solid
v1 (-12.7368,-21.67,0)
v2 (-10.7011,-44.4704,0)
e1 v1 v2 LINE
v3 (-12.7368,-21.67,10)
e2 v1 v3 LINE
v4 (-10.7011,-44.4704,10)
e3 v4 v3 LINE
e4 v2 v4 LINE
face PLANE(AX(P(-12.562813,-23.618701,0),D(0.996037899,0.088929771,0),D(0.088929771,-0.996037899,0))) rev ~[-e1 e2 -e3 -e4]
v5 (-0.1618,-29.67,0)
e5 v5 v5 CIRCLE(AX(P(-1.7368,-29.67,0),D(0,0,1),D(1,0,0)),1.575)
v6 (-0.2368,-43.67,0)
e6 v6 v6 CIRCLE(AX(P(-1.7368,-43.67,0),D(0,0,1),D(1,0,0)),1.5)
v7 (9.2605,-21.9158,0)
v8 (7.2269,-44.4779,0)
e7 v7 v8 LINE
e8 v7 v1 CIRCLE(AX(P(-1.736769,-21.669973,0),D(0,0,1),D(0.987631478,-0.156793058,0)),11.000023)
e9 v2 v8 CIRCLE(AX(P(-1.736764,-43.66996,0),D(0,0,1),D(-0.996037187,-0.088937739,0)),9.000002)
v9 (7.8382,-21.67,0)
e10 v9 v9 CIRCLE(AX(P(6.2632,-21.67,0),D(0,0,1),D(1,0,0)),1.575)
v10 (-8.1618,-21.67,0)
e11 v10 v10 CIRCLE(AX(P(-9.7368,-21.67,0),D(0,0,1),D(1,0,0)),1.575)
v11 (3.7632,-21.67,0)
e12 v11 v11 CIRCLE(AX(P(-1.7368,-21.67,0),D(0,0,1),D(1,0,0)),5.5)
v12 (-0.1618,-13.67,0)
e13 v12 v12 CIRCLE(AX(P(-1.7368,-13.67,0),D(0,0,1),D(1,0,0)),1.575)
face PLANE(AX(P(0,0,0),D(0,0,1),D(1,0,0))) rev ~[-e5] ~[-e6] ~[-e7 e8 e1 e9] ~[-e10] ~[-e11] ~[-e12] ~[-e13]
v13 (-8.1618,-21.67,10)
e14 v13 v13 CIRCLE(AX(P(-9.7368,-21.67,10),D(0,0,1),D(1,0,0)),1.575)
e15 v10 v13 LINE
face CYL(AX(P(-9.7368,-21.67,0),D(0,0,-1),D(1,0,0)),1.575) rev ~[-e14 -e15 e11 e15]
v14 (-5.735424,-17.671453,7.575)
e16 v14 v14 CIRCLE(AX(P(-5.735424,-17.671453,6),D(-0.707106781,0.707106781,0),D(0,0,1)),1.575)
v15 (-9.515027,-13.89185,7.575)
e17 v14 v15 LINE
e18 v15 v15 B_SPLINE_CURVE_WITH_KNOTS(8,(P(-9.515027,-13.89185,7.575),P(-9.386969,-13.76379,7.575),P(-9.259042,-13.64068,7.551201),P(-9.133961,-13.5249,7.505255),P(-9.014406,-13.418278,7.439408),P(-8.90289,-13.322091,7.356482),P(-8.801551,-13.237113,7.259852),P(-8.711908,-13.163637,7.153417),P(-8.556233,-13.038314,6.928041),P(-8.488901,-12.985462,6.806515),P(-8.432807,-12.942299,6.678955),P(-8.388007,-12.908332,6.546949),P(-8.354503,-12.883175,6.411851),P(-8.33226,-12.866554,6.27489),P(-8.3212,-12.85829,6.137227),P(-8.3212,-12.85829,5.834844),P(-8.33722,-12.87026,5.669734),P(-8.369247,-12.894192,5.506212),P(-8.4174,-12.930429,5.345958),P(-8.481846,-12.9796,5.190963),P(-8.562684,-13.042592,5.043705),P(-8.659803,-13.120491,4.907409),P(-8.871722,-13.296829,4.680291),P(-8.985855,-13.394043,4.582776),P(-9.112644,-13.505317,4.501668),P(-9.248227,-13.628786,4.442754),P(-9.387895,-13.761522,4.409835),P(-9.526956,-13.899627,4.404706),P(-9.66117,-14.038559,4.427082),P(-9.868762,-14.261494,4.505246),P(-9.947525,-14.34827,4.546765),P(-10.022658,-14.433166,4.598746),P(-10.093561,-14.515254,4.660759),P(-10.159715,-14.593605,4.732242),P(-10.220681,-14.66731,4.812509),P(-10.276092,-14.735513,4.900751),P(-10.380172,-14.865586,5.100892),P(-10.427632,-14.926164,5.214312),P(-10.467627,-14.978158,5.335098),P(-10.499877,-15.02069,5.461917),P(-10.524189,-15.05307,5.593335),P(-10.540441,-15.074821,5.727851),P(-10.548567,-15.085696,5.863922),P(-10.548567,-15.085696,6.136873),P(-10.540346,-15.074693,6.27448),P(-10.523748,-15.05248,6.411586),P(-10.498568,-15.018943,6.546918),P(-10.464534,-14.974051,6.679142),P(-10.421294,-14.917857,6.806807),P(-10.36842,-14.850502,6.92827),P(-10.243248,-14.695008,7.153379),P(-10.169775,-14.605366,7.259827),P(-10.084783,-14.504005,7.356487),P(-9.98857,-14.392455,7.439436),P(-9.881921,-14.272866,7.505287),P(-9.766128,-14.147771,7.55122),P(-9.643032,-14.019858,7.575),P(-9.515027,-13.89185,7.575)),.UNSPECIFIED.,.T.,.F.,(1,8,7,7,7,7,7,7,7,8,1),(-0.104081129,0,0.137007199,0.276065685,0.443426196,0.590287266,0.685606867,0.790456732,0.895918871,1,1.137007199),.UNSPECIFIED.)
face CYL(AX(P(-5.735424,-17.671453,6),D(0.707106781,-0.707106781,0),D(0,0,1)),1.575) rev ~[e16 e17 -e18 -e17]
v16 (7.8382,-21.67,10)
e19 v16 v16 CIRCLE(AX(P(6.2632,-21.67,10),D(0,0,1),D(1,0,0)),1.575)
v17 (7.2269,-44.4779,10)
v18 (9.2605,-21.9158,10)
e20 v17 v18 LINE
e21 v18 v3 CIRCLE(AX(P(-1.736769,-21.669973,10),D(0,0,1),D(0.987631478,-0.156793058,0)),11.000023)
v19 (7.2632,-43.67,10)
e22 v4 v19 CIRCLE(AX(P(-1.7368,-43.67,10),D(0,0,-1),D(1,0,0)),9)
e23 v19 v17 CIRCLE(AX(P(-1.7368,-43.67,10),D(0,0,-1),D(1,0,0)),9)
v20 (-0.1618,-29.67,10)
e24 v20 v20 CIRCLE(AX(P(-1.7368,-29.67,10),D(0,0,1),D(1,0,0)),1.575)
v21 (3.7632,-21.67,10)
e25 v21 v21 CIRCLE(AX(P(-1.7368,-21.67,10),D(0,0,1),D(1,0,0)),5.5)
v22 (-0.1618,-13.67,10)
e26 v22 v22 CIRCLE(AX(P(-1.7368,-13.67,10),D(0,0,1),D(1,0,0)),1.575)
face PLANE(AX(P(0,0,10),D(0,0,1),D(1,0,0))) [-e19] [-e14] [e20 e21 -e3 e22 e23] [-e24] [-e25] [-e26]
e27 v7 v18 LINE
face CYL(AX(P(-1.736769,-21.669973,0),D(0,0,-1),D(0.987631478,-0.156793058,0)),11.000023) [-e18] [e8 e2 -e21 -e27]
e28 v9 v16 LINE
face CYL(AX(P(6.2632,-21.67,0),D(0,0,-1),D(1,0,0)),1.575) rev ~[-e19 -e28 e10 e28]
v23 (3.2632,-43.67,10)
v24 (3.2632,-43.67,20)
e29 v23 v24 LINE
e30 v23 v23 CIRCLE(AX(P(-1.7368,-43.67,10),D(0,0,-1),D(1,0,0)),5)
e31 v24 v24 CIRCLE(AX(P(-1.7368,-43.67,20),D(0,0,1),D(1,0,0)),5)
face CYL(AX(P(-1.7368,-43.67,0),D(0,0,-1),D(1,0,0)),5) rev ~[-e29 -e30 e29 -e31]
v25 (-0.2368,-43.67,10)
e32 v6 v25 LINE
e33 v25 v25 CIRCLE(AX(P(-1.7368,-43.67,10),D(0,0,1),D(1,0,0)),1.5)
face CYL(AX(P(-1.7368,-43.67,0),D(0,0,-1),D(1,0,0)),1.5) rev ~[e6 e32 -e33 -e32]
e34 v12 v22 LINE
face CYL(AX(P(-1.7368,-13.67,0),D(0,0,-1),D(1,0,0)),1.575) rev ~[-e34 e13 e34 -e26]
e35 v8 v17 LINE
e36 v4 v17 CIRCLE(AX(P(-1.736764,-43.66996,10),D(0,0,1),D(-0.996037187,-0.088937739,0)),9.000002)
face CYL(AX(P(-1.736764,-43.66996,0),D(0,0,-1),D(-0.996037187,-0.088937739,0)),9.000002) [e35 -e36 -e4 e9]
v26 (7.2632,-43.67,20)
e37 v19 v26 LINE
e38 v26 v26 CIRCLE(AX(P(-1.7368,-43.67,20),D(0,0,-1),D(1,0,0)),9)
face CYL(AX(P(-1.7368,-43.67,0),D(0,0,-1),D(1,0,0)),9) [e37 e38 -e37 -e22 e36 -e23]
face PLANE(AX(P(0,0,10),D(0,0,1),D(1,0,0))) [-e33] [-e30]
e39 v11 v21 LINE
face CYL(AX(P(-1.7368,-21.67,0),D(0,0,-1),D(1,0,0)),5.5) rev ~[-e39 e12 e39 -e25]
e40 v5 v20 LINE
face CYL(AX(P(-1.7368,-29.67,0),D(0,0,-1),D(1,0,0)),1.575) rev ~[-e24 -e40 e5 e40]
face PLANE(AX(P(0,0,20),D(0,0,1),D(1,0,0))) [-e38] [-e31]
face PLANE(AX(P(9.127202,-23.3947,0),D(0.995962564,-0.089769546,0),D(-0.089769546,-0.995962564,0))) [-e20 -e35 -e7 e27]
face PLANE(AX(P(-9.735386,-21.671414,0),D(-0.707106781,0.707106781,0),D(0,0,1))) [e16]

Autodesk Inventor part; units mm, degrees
ref_plane "YZ Plane" through (0, 0, 0) normal (1, 0, 0) x (0, 1, 0)
sketch "Эскиз1" plane through (0, 0, 0) normal (0, 0, 1) x (1, 0, 0)
  circle A0 centre (-1.7368, -21.67) radius 2.375 projected
  circle A1 centre (-1.7368, -21.67) radius 7.5
  line L0 (-1.7368, -14.17) -> (-1.7368, -54.17) construction
  arc A2 (5.7632, -21.67) -> (-9.2368, -21.67) centre (-1.7368, -21.67) ccw
  circle A3 centre (-1.7368, -43.67) radius 9
  circle A4 centre (-1.7368, -43.67) radius 1.5
  circle A5 centre (-1.7368, -43.67) radius 5
  line L1 (-10.7368, -43.67) -> (-9.2368, -21.67)
  line L2 (7.2632, -43.67) -> (5.7632, -21.67)
  point P0 (0, 0)
  point P1 (-1.7368, -34.17)
  dimension "d1" = 15
  dimension "d3" = 18
  dimension "d4" = 3
  dimension "d9" = 10
  dimension "d36" = 22
extrude "Выдавливание1" add sketch "Эскиз1" along normal blind 20 contours L2 A3 L1 | A3 L2 | L1 A3
ref_plane "РабПлоскость1" through (0, 0, 0) normal (0, 0, 1) x (1, 0, 0)
sketch "Эскиз2" plane through (0, 0, 0) normal (0, 0, 1) x (1, 0, 0)
  arc A0 (-10.7011, -44.4704) -> (7.2269, -44.4779) centre (-1.7368, -43.67) ccw
  circle A1 centre (-1.7368, -46.2892) radius 1.5 construction
  line L0 (-1.7368, -46.2892) -> (-1.7368, -6.2497) construction
  line L1 (55.1846, -47.0725) -> (61.6072, -35.9345) construction
  line L2 (61.6072, -35.9345) -> (57.2758, -33.4368) construction
  line L3 (57.2758, -33.4368) -> (59.7378, -29.1672) construction
  line L4 (59.7378, -29.1672) -> (54.2369, -25.9951) construction
  line L5 (54.2369, -25.9951) -> (53.6124, -27.078) construction
  line L6 (53.6124, -27.078) -> (51.62, -25.929) construction
  line L7 (51.62, -25.929) -> (52.2444, -24.8462) construction
  line L8 (52.2444, -24.8462) -> (46.7434, -21.6741) construction
  line L9 (46.7434, -21.6741) -> (48.2421, -19.0752) construction
  line L10 (48.2421, -19.0752) -> (53.743, -22.2473) construction
  line L11 (53.743, -22.2473) -> (54.3674, -21.1644) construction
  line L12 (54.3674, -21.1644) -> (56.3599, -22.3134) construction
  line L13 (56.3599, -22.3134) -> (55.7355, -23.3962) construction
  line L14 (55.7355, -23.3962) -> (61.2364, -26.5683) construction
  line L15 (61.2364, -26.5683) -> (63.6984, -22.2987) construction
  line L16 (63.6984, -22.2987) -> (68.0299, -24.7964) construction
  line L17 (68.0299, -24.7964) -> (74.4526, -13.6584) construction
  line L18 (74.4526, -13.6584) -> (23.3414, 15.8145) construction
  arc A2 (23.3414, 15.8145) -> (19.2439, 14.7142) centre (21.8428, 13.2156) ccw construction
  line L19 (19.2439, 14.7142) -> (16.6854, 10.2772) construction
  arc A3 (12.8035, 9.064) -> (16.6854, 10.2772) centre (14.0865, 11.7758) ccw construction
  arc A4 (12.8035, 9.064) -> (-21.0534, -49.6498) centre (-1.7368, -21.67) ccw construction
  arc A5 (-20.1589, -53.6172) -> (-21.0534, -49.6498) centre (-22.7578, -52.1186) ccw construction
  line L20 (-20.1589, -53.6172) -> (-22.7175, -58.0542) construction
  arc A6 (-22.7175, -58.0542) -> (-21.6172, -62.1517) centre (-20.1186, -59.5528) ccw construction
  line L21 (-21.6172, -62.1517) -> (29.4939, -91.6246) construction
  line L22 (29.4939, -91.6246) -> (35.9166, -80.4866) construction
  line L23 (35.9166, -80.4866) -> (31.5851, -77.9889) construction
  line L24 (31.5851, -77.9889) -> (34.0472, -73.7193) construction
  line L25 (34.0472, -73.7193) -> (28.5462, -70.5472) construction
  line L26 (28.5462, -70.5472) -> (27.9218, -71.6301) construction
  line L27 (27.9218, -71.6301) -> (25.9293, -70.4811) construction
  line L28 (25.9293, -70.4811) -> (26.5537, -69.3983) construction
  line L29 (26.5537, -69.3983) -> (21.0528, -66.2262) construction
  line L30 (21.0528, -66.2262) -> (22.5514, -63.6273) construction
  line L31 (22.5514, -63.6273) -> (28.0524, -66.7994) construction
  line L32 (28.0524, -66.7994) -> (28.6768, -65.7165) construction
  line L33 (28.6768, -65.7165) -> (30.6693, -66.8655) construction
  line L34 (30.6693, -66.8655) -> (30.0448, -67.9483) construction
  line L35 (30.0448, -67.9483) -> (35.5458, -71.1204) construction
  line L36 (35.5458, -71.1204) -> (38.0078, -66.8508) construction
  line L37 (38.0078, -66.8508) -> (42.3393, -69.3485) construction
  line L38 (42.3393, -69.3485) -> (48.7619, -58.2105) construction
  line L39 (48.7619, -58.2105) -> (44.4305, -55.7128) construction
  line L40 (44.4305, -55.7128) -> (50.8531, -44.5748) construction
  line L41 (50.8531, -44.5748) -> (55.1846, -47.0725) construction
  circle A7 centre (-1.7368, -21.67) radius 2.375 construction
  circle A8 centre (-1.7368, -21.67) radius 5.5
  arc A9 (9.1272, -23.3947) -> (-12.5628, -23.6187) centre (-1.7368, -21.67) ccw
  line L42 (-12.7368, -21.67) -> (-10.7011, -44.4704)
  circle A10 centre (-1.7368, -43.67) radius 9 construction
  line L43 (9.2605, -21.9158) -> (7.2269, -44.4779)
  circle A11 centre (-1.7368, -43.67) radius 1.5
  circle A12 centre (-1.7368, -13.67) radius 1.575
  circle A13 centre (6.2632, -21.67) radius 1.575
  circle A14 centre (-1.7368, -29.67) radius 1.575
  circle A15 centre (-9.7368, -21.67) radius 1.575
  point P0 (0, 0)
  point P1 (-1.7368, -12.095)
  point P2 (-1.7368, -10.67)
  point P3 (-1.7368, -10.67)
  point P4 (7.8382, -21.67)
  point P5 (-1.7368, -31.245)
  point P6 (-11.3118, -21.67)
  dimension "d22" = 3.15
  dimension "d20" = 11
  dimension "d21" = 22
  dimension "d27" = 8
  dimension "d30" = 360
extrude "Выдавливание2" add sketch "Эскиз2" along normal blind 10 contours L42 A9 L43 A0
ref_plane "РабПлоскость5" through (-9.7368, -21.67, 0) normal (-0.7071068, 0.7071068, 0) x (0, 0, 1)
sketch "Эскиз4" plane through (-9.7368, -21.67, 0) normal (-0.7071068, 0.7071068, 0) x (0, 0, 1)
  line L0 (10, 1.575) -> (0, 1.575) construction
  line L1 (0, 9.7387) -> (10, 9.7387) construction
  line L2 (10, -3.8949) -> (0, -3.8949) construction
  line L3 (0, -3.8949) -> (0, -1.575) construction
  line L4 (0, -1.575) -> (10, -1.575) construction
  line L5 (10, -1.575) -> (10, -3.8949) construction
  line L6 (0, 15.0908) -> (10, 15.0908) construction
  line L7 (10, 15.0908) -> (10, 12.8887) construction
  line L8 (10, 12.8887) -> (0, 12.8887) construction
  line L9 (0, 12.8887) -> (0, 15.0908) construction
  line L10 (10, 1.575) -> (10, -1.575) construction
  line L11 (0, 12.8887) -> (0, 9.7387) construction
  circle A0 centre (6, 5.6568) radius 1.575
  line L12 (0, 1.575) -> (0, 9.7387) projected
  line L13 (10, 9.7387) -> (10, 1.575) projected
  point P0 (0, 22.208)
  dimension "d32" = 3.15
extrude "Выдавливание4" cut sketch "Эскиз4" along normal blind 10
properties part number "кривошип" material "Пластик САН"
